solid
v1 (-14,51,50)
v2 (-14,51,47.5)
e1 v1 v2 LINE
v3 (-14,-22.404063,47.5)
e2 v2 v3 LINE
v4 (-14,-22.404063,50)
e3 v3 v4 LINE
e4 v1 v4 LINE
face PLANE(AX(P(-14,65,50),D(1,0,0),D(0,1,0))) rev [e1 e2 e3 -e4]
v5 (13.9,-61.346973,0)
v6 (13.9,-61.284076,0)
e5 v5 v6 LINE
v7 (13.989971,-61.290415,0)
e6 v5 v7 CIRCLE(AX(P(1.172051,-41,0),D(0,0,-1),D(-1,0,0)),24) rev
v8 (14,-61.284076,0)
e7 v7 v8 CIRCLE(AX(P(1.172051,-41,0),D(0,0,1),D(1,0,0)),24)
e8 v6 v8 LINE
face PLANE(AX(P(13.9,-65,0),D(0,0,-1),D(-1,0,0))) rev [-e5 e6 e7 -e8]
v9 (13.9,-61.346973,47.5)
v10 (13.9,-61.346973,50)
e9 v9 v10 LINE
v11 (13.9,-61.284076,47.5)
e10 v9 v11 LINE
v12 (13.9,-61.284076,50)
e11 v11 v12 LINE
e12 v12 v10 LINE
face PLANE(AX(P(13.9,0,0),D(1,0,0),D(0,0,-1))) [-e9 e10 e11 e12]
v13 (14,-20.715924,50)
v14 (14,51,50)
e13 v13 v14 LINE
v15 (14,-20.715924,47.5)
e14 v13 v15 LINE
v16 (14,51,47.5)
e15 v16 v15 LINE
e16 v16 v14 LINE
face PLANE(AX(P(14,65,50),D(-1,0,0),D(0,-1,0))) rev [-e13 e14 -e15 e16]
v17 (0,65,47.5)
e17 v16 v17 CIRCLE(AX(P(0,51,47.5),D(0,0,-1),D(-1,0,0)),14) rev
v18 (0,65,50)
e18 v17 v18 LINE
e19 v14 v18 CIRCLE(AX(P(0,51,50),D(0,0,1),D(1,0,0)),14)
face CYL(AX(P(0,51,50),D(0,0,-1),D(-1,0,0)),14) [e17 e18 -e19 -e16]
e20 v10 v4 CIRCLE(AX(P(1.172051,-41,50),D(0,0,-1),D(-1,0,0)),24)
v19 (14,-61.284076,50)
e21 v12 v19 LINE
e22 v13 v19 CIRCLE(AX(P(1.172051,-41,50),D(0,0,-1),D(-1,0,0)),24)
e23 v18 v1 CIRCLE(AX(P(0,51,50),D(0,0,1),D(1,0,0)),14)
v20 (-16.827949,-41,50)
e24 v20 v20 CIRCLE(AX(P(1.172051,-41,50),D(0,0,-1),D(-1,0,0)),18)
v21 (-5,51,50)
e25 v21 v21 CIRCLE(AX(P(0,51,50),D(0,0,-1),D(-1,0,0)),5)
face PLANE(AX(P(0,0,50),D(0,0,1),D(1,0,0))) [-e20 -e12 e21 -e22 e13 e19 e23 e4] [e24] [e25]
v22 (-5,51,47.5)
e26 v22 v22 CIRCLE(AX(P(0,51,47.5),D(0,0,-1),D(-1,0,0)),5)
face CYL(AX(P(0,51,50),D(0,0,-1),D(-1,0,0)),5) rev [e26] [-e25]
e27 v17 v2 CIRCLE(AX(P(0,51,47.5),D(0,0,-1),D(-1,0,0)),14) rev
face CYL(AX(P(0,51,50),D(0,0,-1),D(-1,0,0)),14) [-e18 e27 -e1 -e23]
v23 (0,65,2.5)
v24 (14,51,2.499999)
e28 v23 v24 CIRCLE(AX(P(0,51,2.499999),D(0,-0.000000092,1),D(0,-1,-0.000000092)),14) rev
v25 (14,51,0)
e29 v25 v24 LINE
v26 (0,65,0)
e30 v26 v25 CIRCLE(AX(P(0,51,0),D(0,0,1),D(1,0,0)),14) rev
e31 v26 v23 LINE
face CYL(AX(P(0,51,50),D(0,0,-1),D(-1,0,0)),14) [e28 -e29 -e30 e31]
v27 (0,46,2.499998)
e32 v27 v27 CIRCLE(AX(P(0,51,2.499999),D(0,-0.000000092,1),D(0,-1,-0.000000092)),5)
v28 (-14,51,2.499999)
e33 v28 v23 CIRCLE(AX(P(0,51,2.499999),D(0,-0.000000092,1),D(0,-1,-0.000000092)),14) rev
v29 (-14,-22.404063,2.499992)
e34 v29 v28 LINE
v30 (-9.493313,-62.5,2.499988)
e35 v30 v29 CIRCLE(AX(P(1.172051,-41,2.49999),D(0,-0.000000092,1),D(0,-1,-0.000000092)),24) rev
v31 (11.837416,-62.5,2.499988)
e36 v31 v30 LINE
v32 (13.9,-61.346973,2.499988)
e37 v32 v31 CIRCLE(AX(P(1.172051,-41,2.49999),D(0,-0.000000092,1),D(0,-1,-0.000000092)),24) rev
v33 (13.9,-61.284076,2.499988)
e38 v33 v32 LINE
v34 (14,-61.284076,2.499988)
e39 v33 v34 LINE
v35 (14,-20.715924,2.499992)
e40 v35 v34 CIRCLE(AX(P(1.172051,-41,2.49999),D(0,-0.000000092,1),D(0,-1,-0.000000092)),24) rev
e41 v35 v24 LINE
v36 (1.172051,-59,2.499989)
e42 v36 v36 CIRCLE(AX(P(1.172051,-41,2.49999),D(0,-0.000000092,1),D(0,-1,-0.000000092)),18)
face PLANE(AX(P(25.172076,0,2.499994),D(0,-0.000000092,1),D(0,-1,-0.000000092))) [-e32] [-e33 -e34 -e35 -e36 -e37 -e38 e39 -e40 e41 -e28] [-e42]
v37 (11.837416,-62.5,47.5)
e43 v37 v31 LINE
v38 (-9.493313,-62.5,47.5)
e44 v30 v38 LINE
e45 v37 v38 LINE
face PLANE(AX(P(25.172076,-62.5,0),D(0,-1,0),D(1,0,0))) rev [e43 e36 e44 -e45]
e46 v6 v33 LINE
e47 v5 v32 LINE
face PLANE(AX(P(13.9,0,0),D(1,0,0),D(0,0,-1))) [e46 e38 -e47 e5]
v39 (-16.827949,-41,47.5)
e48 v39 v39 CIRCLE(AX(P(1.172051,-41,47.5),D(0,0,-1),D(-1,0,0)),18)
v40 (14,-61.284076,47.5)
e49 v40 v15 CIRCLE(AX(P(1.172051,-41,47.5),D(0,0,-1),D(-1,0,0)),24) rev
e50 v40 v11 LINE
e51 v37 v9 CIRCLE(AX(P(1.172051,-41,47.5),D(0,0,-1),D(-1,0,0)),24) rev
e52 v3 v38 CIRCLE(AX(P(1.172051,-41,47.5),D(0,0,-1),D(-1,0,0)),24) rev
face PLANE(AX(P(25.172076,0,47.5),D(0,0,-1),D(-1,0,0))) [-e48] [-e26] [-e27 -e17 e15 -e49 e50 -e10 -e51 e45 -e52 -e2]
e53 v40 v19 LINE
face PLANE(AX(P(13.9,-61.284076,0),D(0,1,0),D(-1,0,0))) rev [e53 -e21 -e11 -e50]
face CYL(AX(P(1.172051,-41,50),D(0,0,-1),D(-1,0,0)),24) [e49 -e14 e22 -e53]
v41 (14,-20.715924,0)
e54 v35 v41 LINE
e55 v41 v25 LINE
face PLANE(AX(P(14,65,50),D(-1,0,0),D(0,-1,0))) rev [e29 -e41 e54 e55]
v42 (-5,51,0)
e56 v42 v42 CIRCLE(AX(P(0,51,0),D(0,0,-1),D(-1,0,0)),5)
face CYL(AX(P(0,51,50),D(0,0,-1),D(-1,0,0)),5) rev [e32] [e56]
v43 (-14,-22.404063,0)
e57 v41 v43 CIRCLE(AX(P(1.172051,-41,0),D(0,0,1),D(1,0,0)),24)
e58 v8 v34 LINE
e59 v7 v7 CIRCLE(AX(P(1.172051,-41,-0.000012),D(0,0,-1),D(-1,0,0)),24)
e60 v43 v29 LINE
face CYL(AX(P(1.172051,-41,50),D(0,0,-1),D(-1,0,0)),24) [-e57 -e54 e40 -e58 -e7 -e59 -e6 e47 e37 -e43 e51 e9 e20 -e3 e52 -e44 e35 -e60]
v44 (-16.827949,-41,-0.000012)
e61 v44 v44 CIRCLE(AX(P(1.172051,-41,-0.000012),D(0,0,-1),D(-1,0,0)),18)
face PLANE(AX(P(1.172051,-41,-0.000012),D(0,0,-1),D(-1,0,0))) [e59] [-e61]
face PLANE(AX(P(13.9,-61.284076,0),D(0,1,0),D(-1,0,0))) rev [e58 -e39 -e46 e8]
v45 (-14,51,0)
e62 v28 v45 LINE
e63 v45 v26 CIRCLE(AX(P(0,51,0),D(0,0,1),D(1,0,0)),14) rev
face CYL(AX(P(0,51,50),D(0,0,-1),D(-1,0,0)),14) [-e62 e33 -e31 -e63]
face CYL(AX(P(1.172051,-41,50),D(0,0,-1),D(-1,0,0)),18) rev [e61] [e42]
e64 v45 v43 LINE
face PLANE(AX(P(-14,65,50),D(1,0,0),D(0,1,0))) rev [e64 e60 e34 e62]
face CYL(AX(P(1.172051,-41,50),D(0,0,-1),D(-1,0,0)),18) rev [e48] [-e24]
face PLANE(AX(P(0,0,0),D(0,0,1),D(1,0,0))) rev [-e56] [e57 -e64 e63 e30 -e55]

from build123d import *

# Parameters (mm, degrees)
ESBO_O1_W                  = 28
ESBO_O1_H                  = 130
RESSALTO_EXTRUS_O1_DEPTH   = 50
RESSALTO_EXTRUS_O2_START   = -50
ESBO_O2_R                  = 24
RESSALTO_EXTRUS_O2_DEPTH   = 50.000012
CORTE_EXTRUS_O2_DEPTH      = 86.782476988
CORTE_EXTRUS_O2_DEPTH_BACK = 86.782476988
ESBO_O6_W                  = 50
ESBO_O6_H                  = 3.715924279
CORTE_EXTRUS_O6_DEPTH      = 0.1
FILETE1_R                  = 14
CORTE_EXTRUS_O7_DEPTH      = 91.881514017
CORTE_EXTRUS_O8_DEPTH      = 91.881514017
ESBO_O12_R                 = 5
CORTE_EXTRUS_O10_DEPTH     = 86.782469994
ESBO_O13_R                 = 18
CORTE_EXTRUS_O11_DEPTH     = 86.782476988


with BuildPart() as part:
    # Esboço1 → Ressalto-extrusão1 (new body)
    with BuildSketch(Plane.XY):
        Rectangle(ESBO_O1_W, ESBO_O1_H)
    extrude(amount=RESSALTO_EXTRUS_O1_DEPTH)

    # Esboço2 → Ressalto-extrusão2 (add)
    with BuildSketch(Plane(origin=(0, 0, 0), x_dir=(-1, 0, 0), z_dir=(0, 0, -1)).offset(RESSALTO_EXTRUS_O2_START)):
        with Locations((-1.172051133, -41)):
            Circle(ESBO_O2_R)
    extrude(amount=RESSALTO_EXTRUS_O2_DEPTH)

    # Esboço5 → Corte-extrusão2 (cut, two sides: drawn at the far end of the back side and taken through both)
    with BuildSketch(Plane(origin=(0, 0, -1.2e-05), x_dir=(-1, 0, 0), z_dir=(0, 0, -1)).offset(-CORTE_EXTRUS_O2_DEPTH_BACK)):
        with BuildLine():
            ThreePointArc((-1.172051133, -65), (-7.844009292, -64.053957889), (-13.989971335, -61.290414528))
            Line((-13.989971335, -61.290414528), (-14, -65))
            Line((-14, -65), (-1.172051133, -65))
        make_face()
        with BuildLine():
            ThreePointArc((14, -59.595936771), (6.880821568, -63.608654123), (-1.172051133, -65))
            Line((-1.172051133, -65), (14, -65))
            Line((14, -65), (14, -59.595936771))
        make_face()
    extrude(amount=CORTE_EXTRUS_O2_DEPTH + CORTE_EXTRUS_O2_DEPTH_BACK, mode=Mode.SUBTRACT)

    # Esboço6 → Corte-extrusão6 (cut)
    with BuildSketch(Plane(origin=(14, 0, 0), x_dir=(0, 0, -1), z_dir=(1, 0, 0))):
        with Locations((-25, -63.14203786)):
            Rectangle(ESBO_O6_W, ESBO_O6_H)
    extrude(amount=-CORTE_EXTRUS_O6_DEPTH, mode=Mode.SUBTRACT)

    # Filete1
    filete1_edges = [part.edges().sort_by_distance(p)[0] for p in [
        (14, 65, 25),
        (-14, 65, 25),
    ]]
    fillet(filete1_edges, radius=FILETE1_R - 0.0001)  # a hair under: the kernel refuses the full size

    # Esboço8 → Corte-extrusão7 (cut, through all)
    with BuildSketch(Plane.ZY.offset(14)):
        Polygon((47.5, -22.404063229), (2.499991932, -22.404063229), (2.499988231, -62.5), (47.5, -62.5), align=None)
        Polygon((2.499998708, 51), (2.499991932, -22.404063229), (47.5, -22.404063229), (47.5, 51), align=None)
        Polygon((2.5, 64.999999769), (2.499998708, 51), (47.5, 51), (47.5, 65), align=None)
    extrude(amount=-CORTE_EXTRUS_O7_DEPTH, mode=Mode.SUBTRACT)

    # Esboço9 → Corte-extrusão8 (cut, through all)
    with BuildSketch(Plane(origin=(-14, 0, 0), x_dir=(0, 0, -1), z_dir=(1, 0, 0))):
        Polygon((-2.499991932, -22.404063229), (-2.499988499, -59.595936771), (-47.5, -59.595936771), (-47.5, -22.404063229), align=None)
    extrude(amount=-CORTE_EXTRUS_O8_DEPTH, mode=Mode.SUBTRACT)

    # Esboço12 → Corte-extrusão10 (cut, through all)
    with BuildSketch(Plane(origin=(0, 0, 0), x_dir=(-1, 0, 0), z_dir=(0, 0, -1))):
        with Locations((0, 51)):
            Circle(ESBO_O12_R)
    extrude(amount=-CORTE_EXTRUS_O10_DEPTH, mode=Mode.SUBTRACT)

    # Esboço13 → Corte-extrusão11 (cut, through all)
    with BuildSketch(Plane(origin=(0, 0, -1.2e-05), x_dir=(-1, 0, 0), z_dir=(0, 0, -1))):
        with Locations((-1.172051133, -41)):
            Circle(ESBO_O13_R)
    extrude(amount=-CORTE_EXTRUS_O11_DEPTH, mode=Mode.SUBTRACT)


solid = part.part
